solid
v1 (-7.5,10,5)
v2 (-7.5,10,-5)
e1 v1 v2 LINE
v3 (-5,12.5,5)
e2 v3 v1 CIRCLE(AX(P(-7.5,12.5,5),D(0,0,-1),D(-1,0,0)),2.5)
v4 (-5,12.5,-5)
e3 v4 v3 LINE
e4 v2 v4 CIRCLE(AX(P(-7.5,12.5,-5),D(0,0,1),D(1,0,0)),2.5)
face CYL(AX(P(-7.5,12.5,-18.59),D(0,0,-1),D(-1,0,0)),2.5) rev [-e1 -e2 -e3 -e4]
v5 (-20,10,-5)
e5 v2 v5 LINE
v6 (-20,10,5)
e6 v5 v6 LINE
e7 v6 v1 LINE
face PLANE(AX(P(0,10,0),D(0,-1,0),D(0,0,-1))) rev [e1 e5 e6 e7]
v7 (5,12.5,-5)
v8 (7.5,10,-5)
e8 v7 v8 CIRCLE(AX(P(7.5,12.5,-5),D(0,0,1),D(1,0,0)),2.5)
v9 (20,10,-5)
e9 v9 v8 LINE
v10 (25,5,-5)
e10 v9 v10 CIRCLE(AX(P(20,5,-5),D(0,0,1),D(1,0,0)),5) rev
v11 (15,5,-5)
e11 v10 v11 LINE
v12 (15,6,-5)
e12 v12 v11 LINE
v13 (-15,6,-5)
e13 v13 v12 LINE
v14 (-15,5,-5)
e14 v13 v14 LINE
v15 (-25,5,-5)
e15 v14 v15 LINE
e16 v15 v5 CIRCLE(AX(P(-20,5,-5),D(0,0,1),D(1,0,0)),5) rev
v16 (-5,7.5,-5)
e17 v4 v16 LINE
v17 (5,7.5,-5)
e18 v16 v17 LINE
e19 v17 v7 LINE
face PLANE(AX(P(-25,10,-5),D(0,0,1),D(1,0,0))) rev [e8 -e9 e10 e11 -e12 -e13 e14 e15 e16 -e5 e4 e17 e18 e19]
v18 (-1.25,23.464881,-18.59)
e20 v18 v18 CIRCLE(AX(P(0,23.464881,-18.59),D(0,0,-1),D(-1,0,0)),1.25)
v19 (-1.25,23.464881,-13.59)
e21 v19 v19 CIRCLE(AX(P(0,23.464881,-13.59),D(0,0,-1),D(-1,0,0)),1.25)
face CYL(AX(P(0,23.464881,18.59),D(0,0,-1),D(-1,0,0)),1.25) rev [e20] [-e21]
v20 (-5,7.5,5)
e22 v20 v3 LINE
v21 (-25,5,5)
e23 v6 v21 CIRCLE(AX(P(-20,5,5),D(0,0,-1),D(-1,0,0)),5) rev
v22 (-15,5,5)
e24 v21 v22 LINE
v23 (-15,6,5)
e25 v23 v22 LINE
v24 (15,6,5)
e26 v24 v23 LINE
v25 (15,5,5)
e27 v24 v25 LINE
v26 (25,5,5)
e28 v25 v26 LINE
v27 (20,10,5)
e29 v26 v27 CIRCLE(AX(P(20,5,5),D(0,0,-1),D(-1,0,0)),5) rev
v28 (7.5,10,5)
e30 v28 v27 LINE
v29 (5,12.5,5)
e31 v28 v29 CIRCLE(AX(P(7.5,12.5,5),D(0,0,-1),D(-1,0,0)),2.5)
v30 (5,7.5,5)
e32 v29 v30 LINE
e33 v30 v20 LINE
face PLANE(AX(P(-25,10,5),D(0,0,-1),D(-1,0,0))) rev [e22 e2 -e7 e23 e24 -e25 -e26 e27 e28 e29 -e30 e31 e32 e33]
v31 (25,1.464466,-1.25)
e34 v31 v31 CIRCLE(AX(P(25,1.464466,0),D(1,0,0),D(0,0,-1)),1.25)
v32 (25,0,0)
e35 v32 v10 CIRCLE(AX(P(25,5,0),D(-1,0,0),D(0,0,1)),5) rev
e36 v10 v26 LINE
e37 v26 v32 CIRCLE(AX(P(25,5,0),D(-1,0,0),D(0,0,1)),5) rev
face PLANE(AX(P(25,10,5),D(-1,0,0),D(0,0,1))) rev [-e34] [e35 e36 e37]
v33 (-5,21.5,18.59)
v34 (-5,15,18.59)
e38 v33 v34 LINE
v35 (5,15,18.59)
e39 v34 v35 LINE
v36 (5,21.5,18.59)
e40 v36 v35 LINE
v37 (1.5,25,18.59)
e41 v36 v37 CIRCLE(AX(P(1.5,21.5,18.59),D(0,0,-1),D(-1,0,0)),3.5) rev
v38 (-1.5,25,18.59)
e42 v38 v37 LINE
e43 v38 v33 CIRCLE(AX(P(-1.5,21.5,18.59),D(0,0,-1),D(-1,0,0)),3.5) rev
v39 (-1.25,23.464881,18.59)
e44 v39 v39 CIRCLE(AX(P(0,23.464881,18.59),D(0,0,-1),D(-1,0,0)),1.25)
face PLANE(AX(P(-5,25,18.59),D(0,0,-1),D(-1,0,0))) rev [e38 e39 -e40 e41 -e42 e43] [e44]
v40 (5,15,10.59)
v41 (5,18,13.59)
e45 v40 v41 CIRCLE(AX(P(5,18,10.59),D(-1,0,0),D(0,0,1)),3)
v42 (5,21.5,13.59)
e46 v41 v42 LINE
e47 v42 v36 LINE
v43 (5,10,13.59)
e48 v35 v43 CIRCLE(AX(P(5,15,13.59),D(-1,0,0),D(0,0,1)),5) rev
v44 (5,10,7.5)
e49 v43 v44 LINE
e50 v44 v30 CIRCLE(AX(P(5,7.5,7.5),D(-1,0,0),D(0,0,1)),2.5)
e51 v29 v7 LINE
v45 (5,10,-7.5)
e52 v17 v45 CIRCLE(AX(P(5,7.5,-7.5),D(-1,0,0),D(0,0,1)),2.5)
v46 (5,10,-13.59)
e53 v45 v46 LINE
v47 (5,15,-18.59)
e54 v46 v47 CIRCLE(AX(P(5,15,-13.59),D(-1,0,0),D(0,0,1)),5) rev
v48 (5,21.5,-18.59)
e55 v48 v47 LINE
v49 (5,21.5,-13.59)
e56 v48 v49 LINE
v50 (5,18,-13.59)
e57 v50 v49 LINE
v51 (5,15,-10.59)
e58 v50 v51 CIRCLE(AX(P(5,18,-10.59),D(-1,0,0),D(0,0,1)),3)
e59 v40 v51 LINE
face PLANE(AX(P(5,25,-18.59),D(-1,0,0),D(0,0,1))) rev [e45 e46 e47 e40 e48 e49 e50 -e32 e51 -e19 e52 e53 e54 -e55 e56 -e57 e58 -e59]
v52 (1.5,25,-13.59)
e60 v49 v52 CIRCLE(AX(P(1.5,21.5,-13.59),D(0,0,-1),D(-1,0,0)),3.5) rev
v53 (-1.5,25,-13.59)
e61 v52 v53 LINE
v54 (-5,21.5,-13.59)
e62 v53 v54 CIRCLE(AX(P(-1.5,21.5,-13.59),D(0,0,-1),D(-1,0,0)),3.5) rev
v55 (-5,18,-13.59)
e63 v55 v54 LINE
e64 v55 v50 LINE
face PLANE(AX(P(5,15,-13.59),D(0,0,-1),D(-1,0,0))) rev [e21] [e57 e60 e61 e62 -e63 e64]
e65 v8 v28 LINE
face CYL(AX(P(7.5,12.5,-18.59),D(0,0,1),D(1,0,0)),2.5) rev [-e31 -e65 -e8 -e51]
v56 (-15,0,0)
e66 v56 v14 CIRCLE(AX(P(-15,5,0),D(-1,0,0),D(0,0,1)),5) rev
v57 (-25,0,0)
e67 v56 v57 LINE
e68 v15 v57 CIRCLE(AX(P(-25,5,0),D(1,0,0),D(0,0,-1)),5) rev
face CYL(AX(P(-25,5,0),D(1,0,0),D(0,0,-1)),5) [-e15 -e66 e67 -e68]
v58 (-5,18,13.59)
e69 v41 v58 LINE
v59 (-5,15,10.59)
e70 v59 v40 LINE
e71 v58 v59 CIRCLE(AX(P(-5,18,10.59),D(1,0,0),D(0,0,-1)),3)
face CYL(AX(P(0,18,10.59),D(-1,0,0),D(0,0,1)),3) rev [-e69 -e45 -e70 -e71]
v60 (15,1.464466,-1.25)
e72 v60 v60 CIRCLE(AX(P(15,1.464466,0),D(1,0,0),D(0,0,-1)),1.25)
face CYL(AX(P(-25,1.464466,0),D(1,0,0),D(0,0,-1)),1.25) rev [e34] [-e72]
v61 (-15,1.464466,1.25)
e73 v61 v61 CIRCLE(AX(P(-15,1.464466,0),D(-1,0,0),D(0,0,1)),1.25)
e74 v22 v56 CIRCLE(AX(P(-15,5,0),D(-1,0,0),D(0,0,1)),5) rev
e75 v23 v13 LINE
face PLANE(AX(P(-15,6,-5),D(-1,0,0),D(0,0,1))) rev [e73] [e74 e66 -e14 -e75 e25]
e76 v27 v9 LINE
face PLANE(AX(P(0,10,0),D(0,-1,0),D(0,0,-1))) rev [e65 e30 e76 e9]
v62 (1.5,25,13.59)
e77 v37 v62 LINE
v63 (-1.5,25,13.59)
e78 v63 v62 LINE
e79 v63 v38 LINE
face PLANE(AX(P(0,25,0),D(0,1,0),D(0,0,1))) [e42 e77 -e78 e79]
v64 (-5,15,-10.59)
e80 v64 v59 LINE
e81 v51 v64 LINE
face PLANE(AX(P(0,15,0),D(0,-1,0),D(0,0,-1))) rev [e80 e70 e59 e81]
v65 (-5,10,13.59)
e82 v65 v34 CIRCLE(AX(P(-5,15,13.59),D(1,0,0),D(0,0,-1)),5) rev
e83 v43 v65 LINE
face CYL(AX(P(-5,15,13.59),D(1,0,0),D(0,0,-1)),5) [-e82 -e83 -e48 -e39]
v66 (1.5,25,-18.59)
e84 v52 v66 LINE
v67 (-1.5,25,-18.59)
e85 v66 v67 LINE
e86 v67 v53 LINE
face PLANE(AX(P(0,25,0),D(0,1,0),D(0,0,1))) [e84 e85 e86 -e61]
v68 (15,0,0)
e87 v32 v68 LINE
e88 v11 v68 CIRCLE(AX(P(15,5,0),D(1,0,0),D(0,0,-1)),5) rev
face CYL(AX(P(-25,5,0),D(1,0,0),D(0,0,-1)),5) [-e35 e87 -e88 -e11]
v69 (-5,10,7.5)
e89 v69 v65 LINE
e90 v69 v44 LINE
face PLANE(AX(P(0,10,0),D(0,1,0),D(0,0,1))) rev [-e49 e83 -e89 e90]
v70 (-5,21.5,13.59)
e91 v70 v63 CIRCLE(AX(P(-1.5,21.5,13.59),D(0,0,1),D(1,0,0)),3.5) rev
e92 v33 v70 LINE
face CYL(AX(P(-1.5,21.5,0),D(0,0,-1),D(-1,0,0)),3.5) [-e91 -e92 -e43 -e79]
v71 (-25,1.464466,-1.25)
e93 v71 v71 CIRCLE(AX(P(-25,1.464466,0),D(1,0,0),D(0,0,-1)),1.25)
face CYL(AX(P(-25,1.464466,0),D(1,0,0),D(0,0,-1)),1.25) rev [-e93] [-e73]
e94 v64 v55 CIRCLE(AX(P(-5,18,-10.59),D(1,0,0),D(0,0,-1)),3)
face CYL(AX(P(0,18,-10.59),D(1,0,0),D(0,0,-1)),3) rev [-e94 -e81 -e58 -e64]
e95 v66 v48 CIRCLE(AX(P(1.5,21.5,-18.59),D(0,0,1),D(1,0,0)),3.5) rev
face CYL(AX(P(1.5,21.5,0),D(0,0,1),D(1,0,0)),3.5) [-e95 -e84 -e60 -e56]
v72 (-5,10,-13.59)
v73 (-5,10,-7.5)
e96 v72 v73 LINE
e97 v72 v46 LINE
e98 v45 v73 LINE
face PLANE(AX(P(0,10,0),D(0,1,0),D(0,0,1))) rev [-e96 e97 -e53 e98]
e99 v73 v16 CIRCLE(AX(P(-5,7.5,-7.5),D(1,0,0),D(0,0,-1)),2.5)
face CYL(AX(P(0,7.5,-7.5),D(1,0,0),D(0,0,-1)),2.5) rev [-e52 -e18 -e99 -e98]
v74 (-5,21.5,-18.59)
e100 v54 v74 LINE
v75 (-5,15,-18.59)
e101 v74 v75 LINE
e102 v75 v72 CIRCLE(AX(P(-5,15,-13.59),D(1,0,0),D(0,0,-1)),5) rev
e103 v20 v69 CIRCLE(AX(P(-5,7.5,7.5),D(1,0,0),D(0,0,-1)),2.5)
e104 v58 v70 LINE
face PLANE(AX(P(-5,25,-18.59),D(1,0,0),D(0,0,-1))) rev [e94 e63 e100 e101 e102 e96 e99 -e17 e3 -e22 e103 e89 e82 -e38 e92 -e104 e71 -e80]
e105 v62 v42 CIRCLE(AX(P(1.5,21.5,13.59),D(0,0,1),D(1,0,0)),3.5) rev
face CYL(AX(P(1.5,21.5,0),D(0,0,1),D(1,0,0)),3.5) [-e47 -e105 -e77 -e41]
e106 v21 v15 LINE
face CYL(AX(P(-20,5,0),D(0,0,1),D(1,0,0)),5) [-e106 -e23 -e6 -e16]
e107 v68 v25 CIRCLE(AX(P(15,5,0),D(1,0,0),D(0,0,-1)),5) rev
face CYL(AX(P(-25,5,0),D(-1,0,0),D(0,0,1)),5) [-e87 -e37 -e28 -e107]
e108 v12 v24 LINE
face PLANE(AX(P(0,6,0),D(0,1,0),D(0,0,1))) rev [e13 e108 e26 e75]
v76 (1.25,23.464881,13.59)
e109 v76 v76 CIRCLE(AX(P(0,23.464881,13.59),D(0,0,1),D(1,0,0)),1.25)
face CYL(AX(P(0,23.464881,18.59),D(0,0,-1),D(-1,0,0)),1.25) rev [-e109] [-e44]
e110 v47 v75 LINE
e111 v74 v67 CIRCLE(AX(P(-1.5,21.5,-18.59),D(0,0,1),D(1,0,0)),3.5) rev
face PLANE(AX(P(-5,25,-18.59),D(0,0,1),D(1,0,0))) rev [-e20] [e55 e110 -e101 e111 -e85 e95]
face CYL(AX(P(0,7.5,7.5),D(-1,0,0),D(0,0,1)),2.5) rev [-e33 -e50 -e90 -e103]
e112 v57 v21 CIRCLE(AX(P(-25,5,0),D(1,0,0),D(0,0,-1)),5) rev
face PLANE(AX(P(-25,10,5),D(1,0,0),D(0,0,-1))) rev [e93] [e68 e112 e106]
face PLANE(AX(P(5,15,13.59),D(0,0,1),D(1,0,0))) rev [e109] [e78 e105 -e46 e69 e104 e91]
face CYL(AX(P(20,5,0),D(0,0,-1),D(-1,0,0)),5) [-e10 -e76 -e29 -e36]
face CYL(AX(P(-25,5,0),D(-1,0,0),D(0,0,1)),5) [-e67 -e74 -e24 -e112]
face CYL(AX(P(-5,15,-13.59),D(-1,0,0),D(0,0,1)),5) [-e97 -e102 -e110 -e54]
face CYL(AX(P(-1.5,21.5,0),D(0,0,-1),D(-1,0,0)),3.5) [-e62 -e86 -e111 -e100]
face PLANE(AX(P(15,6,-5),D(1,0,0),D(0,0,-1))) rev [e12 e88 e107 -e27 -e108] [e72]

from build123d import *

# Parameters (mm, degrees)
SKETCH1_W               = 50
SKETCH1_H               = 10
BOSS_EXTRUDE1_DEPTH     = 10
SKETCH2_W               = 30
SKETCH2_H               = 10
CUT_EXTRUDE1_DEPTH      = 6
FILLET3_R               = 5
CUT_EXTRUDE2_DEPTH      = 42.533119315
CUT_EXTRUDE2_DEPTH_BACK = 42.533119315
SKETCH3_R               = 1.25
FILLET4_R               = 5
SKETCH4_W               = 10
SKETCH4_H               = 37.18
BOSS_EXTRUDE2_DEPTH     = 15
FILLET7_R               = 2.5
SKETCH5_W               = 10
SKETCH5_H               = 27.18
CUT_EXTRUDE3_DEPTH      = 10
FILLET8_R               = 2.5
CUT_EXTRUDE4_DEPTH      = 48.807451302
CUT_EXTRUDE4_DEPTH_BACK = 48.807451302
SKETCH6_R               = 1.25
FILLET9_R               = 3.5
FILLET10_R              = 5
FILLET11_R              = 3


with BuildPart() as part:
    # Sketch1 → Boss-Extrude1 (new body)
    with BuildSketch(Plane(origin=(0, 0, 0), x_dir=(1, 0, 0), z_dir=(0, 1, 0))):
        Rectangle(SKETCH1_W, SKETCH1_H)
    extrude(amount=BOSS_EXTRUDE1_DEPTH)

    # Sketch2 → Cut-Extrude1 (cut)
    with BuildSketch(Plane.XZ):
        Rectangle(SKETCH2_W, SKETCH2_H)
    extrude(amount=-CUT_EXTRUDE1_DEPTH, mode=Mode.SUBTRACT)

    # Fillet3
    fillet3_edges = [part.edges().sort_by_distance(p)[0] for p in [
        (-20, 0, -5),
        (20, 0, -5),
        (20, 0, 5),
        (-20, 0, 5),
    ]]
    fillet(fillet3_edges, radius=FILLET3_R - 0.0001)  # a hair under: the kernel refuses the full size

    # Sketch3 → Cut-Extrude2 (cut, two sides: drawn at the far end of the back side and taken through both)
    with BuildSketch(Plane(origin=(-15, 0, 0), x_dir=(0, 0, -1), z_dir=(1, 0, 0)).offset(-CUT_EXTRUDE2_DEPTH_BACK)):
        with Locations((0, 1.464466094)):
            Circle(SKETCH3_R)
    extrude(amount=CUT_EXTRUDE2_DEPTH + CUT_EXTRUDE2_DEPTH_BACK, mode=Mode.SUBTRACT)

    # Fillet4
    fillet4_edges = [part.edges().sort_by_distance(p)[0] for p in [
        (25, 10, 0),
        (-25, 10, 0),
    ]]
    fillet(fillet4_edges, radius=FILLET4_R)

    # Sketch4 → Boss-Extrude2 (add)
    with BuildSketch(Plane(origin=(0, 10, 0), x_dir=(1, 0, 0), z_dir=(0, 1, 0))):
        Rectangle(SKETCH4_W, SKETCH4_H)
    extrude(amount=BOSS_EXTRUDE2_DEPTH)

    # Fillet7
    fillet7_edges = [part.edges().sort_by_distance(p)[0] for p in [
        (0, 10, 5),
        (0, 10, -5),
    ]]
    fillet(fillet7_edges, radius=FILLET7_R)

    # Sketch5 → Cut-Extrude3 (cut)
    with BuildSketch(Plane(origin=(0, 25, 0), x_dir=(1, 0, 0), z_dir=(0, 1, 0))):
        Rectangle(SKETCH5_W, SKETCH5_H)
    extrude(amount=-CUT_EXTRUDE3_DEPTH, mode=Mode.SUBTRACT)

    # Fillet8
    fillet8_edges = [part.edges().sort_by_distance(p)[0] for p in [
        (5, 10, 0),
        (-5, 10, 0),
    ]]
    fillet(fillet8_edges, radius=FILLET8_R)

    # Sketch6 → Cut-Extrude4 (cut, two sides: drawn at the far end of the back side and taken through both)
    with BuildSketch(Plane(origin=(0, 0, 13.59), x_dir=(-1, 0, 0), z_dir=(0, 0, -1)).offset(-CUT_EXTRUDE4_DEPTH_BACK)):
        with Locations((0, 23.464881358)):
            Circle(SKETCH6_R)
    extrude(amount=CUT_EXTRUDE4_DEPTH + CUT_EXTRUDE4_DEPTH_BACK, mode=Mode.SUBTRACT)

    # Fillet9
    fillet9_edges = [part.edges().sort_by_distance(p)[0] for p in [
        (-5, 25, 16.09),
        (5, 25, -16.09),
        (-5, 25, -16.09),
        (5, 25, 16.09),
    ]]
    fillet(fillet9_edges, radius=FILLET9_R)

    # Fillet10
    fillet10_edges = [part.edges().sort_by_distance(p)[0] for p in [
        (0, 10, 18.59),
        (0, 10, -18.59),
    ]]
    fillet(fillet10_edges, radius=FILLET10_R)

    # Fillet11
    fillet11_edges = [part.edges().sort_by_distance(p)[0] for p in [
        (0, 15, 13.59),
        (0, 15, -13.59),
    ]]
    fillet(fillet11_edges, radius=FILLET11_R)


solid = part.part
